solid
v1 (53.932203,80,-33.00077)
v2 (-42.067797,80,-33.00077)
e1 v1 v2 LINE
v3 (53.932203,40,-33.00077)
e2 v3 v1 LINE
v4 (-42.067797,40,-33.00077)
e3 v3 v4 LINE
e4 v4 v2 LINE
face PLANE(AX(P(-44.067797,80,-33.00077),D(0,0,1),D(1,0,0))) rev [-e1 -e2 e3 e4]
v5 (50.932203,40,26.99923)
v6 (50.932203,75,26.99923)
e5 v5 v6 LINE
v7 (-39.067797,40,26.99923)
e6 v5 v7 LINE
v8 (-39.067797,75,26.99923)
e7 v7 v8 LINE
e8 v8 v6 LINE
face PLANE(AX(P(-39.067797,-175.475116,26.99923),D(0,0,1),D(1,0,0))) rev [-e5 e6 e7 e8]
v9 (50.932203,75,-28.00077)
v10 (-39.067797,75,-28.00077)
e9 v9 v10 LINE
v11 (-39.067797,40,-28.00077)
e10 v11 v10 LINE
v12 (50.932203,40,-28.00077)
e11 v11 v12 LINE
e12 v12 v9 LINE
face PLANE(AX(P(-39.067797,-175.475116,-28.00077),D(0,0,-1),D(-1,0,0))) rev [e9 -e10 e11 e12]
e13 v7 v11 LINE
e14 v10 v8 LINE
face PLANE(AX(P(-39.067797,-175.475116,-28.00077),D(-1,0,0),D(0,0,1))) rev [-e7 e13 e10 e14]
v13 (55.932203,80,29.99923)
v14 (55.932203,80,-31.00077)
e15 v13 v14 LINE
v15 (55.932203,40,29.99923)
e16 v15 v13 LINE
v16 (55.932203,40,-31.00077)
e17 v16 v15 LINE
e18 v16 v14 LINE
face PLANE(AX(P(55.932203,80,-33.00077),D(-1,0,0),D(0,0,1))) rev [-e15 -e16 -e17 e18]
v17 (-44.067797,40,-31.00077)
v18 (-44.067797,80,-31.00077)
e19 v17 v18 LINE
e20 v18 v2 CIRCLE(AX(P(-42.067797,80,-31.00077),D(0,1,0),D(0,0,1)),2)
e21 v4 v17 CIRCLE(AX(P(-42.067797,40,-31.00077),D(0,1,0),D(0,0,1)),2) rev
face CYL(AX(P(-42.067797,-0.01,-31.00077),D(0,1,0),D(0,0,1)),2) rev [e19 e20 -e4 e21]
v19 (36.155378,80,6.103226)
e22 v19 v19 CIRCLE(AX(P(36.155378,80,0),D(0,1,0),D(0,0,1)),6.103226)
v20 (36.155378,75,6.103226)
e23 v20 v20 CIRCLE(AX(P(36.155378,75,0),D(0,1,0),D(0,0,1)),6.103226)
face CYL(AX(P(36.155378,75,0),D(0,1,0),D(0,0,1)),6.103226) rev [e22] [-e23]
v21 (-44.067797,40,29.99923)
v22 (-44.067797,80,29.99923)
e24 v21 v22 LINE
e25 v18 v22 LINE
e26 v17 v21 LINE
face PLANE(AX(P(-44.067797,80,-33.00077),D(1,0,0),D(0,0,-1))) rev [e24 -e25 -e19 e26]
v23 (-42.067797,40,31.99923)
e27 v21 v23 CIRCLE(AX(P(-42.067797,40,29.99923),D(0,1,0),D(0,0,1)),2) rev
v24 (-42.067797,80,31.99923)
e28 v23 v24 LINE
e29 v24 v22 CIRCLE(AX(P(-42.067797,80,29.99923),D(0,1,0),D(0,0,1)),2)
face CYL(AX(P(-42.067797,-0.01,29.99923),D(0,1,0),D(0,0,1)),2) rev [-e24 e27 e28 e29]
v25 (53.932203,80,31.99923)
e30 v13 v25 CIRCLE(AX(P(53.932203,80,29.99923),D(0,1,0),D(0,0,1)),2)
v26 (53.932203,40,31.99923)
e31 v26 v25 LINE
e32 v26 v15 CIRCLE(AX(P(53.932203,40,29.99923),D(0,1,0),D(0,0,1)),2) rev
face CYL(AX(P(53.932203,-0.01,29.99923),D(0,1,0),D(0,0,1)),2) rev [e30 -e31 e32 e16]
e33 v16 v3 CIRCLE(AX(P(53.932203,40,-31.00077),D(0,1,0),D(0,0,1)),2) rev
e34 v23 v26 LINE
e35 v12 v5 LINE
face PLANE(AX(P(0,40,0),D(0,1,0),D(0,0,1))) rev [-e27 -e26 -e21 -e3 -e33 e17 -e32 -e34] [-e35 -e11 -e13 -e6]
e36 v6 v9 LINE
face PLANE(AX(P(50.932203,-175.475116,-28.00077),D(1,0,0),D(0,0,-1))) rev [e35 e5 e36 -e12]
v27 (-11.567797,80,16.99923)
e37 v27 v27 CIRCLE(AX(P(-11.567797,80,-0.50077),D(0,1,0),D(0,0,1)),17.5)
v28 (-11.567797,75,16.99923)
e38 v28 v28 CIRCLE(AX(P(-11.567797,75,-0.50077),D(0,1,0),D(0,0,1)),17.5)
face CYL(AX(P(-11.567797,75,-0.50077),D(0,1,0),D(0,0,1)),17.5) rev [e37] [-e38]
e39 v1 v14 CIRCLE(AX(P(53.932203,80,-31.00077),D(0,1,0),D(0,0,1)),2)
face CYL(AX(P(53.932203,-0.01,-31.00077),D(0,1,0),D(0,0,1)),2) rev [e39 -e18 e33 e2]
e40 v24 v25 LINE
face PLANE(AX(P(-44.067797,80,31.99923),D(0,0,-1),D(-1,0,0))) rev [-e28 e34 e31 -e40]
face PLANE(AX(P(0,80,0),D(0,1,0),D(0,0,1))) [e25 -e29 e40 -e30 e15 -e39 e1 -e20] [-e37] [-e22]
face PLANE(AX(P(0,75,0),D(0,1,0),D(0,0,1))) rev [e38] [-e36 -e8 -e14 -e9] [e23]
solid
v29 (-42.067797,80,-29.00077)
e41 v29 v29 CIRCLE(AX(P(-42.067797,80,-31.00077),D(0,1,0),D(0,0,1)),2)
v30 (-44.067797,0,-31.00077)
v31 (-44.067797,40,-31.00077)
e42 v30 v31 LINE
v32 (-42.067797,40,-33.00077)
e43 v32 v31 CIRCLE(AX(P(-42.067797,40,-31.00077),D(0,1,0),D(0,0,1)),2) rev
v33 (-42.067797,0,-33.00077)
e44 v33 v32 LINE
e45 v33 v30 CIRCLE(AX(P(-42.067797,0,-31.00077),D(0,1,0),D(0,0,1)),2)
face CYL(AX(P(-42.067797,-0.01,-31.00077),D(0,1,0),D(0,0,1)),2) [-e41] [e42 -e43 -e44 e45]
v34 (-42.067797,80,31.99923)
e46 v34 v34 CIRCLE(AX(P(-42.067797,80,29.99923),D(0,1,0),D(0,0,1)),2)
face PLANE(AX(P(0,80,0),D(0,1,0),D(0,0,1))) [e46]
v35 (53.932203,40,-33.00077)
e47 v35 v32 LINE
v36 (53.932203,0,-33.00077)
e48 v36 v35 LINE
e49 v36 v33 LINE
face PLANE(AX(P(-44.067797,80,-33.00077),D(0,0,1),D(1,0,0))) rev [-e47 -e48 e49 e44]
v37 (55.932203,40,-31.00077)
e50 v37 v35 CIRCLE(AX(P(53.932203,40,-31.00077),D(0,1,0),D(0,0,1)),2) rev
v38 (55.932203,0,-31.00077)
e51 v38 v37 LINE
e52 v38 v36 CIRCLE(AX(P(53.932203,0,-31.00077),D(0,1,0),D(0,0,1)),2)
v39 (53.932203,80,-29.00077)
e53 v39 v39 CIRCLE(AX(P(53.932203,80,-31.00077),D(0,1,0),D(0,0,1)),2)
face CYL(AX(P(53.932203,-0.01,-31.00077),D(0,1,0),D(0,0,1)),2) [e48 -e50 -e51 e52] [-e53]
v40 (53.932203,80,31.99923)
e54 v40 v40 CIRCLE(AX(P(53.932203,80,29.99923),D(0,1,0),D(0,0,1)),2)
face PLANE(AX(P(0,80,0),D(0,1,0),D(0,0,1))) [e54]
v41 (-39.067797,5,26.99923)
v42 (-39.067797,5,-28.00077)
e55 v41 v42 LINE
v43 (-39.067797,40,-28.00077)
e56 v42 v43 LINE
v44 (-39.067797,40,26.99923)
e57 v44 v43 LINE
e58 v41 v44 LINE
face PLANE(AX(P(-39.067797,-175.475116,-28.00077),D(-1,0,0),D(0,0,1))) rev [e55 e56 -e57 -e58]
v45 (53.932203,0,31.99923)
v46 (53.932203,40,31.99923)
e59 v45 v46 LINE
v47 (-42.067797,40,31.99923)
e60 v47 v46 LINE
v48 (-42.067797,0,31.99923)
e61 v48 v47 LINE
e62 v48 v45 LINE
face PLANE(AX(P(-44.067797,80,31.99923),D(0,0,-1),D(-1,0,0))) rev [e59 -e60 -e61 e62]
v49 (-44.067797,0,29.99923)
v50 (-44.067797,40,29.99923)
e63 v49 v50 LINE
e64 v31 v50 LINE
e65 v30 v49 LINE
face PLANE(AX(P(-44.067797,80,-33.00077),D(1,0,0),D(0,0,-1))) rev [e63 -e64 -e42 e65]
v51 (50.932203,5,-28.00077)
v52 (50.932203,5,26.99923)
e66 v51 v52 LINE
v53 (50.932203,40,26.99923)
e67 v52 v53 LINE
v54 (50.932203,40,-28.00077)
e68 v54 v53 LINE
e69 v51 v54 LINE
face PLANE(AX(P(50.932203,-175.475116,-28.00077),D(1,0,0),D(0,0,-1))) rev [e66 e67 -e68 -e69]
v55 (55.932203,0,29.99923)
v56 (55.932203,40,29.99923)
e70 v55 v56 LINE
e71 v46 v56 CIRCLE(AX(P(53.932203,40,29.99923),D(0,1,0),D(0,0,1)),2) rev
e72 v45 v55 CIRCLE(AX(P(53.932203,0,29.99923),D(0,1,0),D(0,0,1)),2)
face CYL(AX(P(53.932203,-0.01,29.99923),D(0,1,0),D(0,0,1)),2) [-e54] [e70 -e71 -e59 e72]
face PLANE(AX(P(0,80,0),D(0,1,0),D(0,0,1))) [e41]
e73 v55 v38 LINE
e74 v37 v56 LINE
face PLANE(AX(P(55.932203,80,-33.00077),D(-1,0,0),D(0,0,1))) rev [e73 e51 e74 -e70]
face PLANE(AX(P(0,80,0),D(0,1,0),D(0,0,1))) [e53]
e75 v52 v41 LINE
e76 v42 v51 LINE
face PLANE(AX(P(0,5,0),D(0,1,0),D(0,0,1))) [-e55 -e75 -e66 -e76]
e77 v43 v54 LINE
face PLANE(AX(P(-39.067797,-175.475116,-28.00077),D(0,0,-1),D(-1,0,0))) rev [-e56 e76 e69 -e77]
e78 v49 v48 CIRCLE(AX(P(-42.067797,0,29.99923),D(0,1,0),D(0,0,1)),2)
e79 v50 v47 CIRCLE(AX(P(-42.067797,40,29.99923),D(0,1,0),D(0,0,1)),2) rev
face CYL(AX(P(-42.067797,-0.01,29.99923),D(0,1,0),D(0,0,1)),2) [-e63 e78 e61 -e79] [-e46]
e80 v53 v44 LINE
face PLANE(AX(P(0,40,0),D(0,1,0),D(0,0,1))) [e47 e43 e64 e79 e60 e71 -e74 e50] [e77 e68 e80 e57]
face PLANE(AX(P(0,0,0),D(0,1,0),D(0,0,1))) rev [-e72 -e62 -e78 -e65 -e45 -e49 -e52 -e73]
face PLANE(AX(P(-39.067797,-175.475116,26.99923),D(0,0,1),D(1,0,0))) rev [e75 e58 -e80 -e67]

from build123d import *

# Parameters (mm, degrees)
SKETCH1_W             = 100
SKETCH1_H             = 65
BOSS_EXTRUDE1_DEPTH   = 80
SKETCH2_W             = 90
SKETCH2_H             = 55
CUT_EXTRUDE2_DEPTH    = 75
SKETCH4_W             = 90
SKETCH4_H             = 55
BOSS_EXTRUDE2_DEPTH   = 5
SKETCH3_R             = 17.5
CUT_EXTRUDE3_DEPTH    = 5
SKETCH5_R             = 6.10322586
CUT_EXTRUDE4_DEPTH    = 5
SPLIT1_START          = -1
SPLIT1_DEPTH          = 82
SPLIT1_2_OUTLINE_R    = 2
SPLIT1_2_DEPTH        = 80
SPLIT1_3_OUTLINE_R    = 2
SPLIT1_3_DEPTH        = 80
SPLIT1_4_OUTLINE_R    = 2
SPLIT1_4_DEPTH        = 80
SPLIT1_5_OUTLINE_R    = 2
SPLIT1_5_DEPTH        = 80
SPLIT1_6_DEPTH        = 80
SPLIT1_7_DEPTH        = 80
SPLIT1_8_DEPTH        = 80
SPLIT1_9_DEPTH        = 80
SPLIT2_START          = 40
SPLIT2_OUTLINE_W      = 90
SPLIT2_OUTLINE_H      = 55
SPLIT2_DEPTH          = 40
SPLIT2_START_2        = 75
SPLIT2_2_OUTLINE_W    = 90
SPLIT2_2_OUTLINE_H    = 55
SPLIT2_2_OUTLINE_R    = 6.10322586
SPLIT2_2_OUTLINE_R_2  = 17.5
SPLIT2_2_DEPTH        = 5
SPLIT2_3_OUTLINE_R    = 2
SPLIT2_3_DEPTH        = 40
SPLIT2_4_OUTLINE_R    = 2
SPLIT2_4_DEPTH        = 40
SPLIT2_5_OUTLINE_R    = 2
SPLIT2_5_DEPTH        = 40
SPLIT2_6_OUTLINE_R    = 2
SPLIT2_6_DEPTH        = 40
SPLIT2_7_OUTLINE_R    = 2
SPLIT2_7_DEPTH        = 40
SPLIT2_8_OUTLINE_R    = 2
SPLIT2_8_DEPTH        = 40
SPLIT2_9_OUTLINE_R    = 2
SPLIT2_9_DEPTH        = 40
SPLIT2_10_OUTLINE_R   = 2
SPLIT2_10_DEPTH       = 40
SPLIT2_11_OUTLINE_R   = 6.10322586
SPLIT2_11_OUTLINE_R_2 = 17.5
SPLIT2_11_DEPTH       = 40


with BuildPart() as part:
    # Sketch1 → Boss-Extrude1 (new body)
    with BuildSketch(Plane(origin=(0, 0, 0), x_dir=(1, 0, 0), z_dir=(0, 1, 0))):
        with Locations((5.93220339, 0.500770416)):
            Rectangle(SKETCH1_W, SKETCH1_H)
    extrude(amount=BOSS_EXTRUDE1_DEPTH)

    # Sketch2 → Cut-Extrude2 (cut)
    with BuildSketch(Plane(origin=(0, 80, 0), x_dir=(1, 0, 0), z_dir=(0, 1, 0))):
        with Locations((5.93220339, 0.500770416)):
            Rectangle(SKETCH2_W, SKETCH2_H)
    extrude(amount=-CUT_EXTRUDE2_DEPTH, mode=Mode.SUBTRACT)

    # Sketch4 → Boss-Extrude2 (add)
    with BuildSketch(Plane(origin=(0, 80, 0), x_dir=(1, 0, 0), z_dir=(0, 1, 0))):
        with Locations((5.93220339, 0.500770416)):
            Rectangle(SKETCH4_W, SKETCH4_H)
    extrude(amount=-BOSS_EXTRUDE2_DEPTH)

    # Sketch3 → Cut-Extrude3 (cut)
    with BuildSketch(Plane(origin=(0, 80, 0), x_dir=(1, 0, 0), z_dir=(0, 1, 0))):
        with Locations(Location((-11.56779661, 0.500770416, 0), (0, 0, 270))):
            Circle(SKETCH3_R)
    extrude(amount=-CUT_EXTRUDE3_DEPTH, mode=Mode.SUBTRACT)

    # Sketch5 → Cut-Extrude4 (cut)
    with BuildSketch(Plane(origin=(0, 80, 0), x_dir=(1, 0, 0), z_dir=(0, 1, 0))):
        with Locations(Location((36.155377847, 0, 0), (0, 0, 270))):
            Circle(SKETCH5_R)
    extrude(amount=-CUT_EXTRUDE4_DEPTH, mode=Mode.SUBTRACT)

    # Split1: read off the stored shape, not the designer's step
    # Split1 outline → Split1 (cut)
    with BuildSketch(Plane(origin=(0, 0, 0), x_dir=(1, 0, 0), z_dir=(0, 1, 0)).offset(SPLIT1_START)):
        with BuildLine():
            Line((-44.06779661, 33.000770416), (-44.06779661, 31.000770416))
            ThreePointArc((-44.06779661, 31.000770416), (-40.653583048, 29.586556854), (-42.06779661, 33.000770416))
            Line((-42.06779661, 33.000770416), (-44.06779661, 33.000770416))
        make_face()
        with BuildLine():
            ThreePointArc((-42.06779661, -31.999229584), (-40.653583048, -28.585016022), (-44.06779661, -29.999229584))
            Line((-44.06779661, -29.999229584), (-44.06779661, -31.999229584))
            Line((-44.06779661, -31.999229584), (-42.06779661, -31.999229584))
        make_face()
        with BuildLine():
            Line((55.93220339, 33.000770416), (53.93220339, 33.000770416))
            ThreePointArc((53.93220339, 33.000770416), (52.517989827, 29.586556854), (55.93220339, 31.000770416))
            Line((55.93220339, 31.000770416), (55.93220339, 33.000770416))
        make_face()
        with BuildLine():
            ThreePointArc((55.93220339, -29.999229584), (52.517989827, -28.585016021), (53.93220339, -31.999229584))
            Line((53.93220339, -31.999229584), (55.93220339, -31.999229584))
            Line((55.93220339, -31.999229584), (55.93220339, -29.999229584))
        make_face()
    extrude(amount=SPLIT1_DEPTH, mode=Mode.SUBTRACT)

    # Split2 11 outline → Split2 11 (cut)
    with BuildSketch(Plane(origin=(0, 0, 0), x_dir=(1, 0, 0), z_dir=(0, 1, 0)).offset(SPLIT2_START)):
        with BuildLine():
            ThreePointArc((-42.06779661, 33.000770416), (-40.653583048, 29.586556854), (-44.06779661, 31.000770416))
            Line((-44.06779661, 31.000770416), (-44.06779661, -29.999229584))
            ThreePointArc((-44.06779661, -29.999229584), (-40.653583048, -28.585016022), (-42.06779661, -31.999229584))
            Line((-42.06779661, -31.999229584), (53.93220339, -31.999229584))
            ThreePointArc((53.93220339, -31.999229584), (52.517989827, -28.585016021), (55.93220339, -29.999229584))
            Line((55.93220339, -29.999229584), (55.93220339, 31.000770416))
            ThreePointArc((55.93220339, 31.000770416), (52.517989827, 29.586556854), (53.93220339, 33.000770416))
            Line((53.93220339, 33.000770416), (-42.06779661, 33.000770416))
        make_face()
        with Locations((36.155377847, 0)):
            Circle(SPLIT2_11_OUTLINE_R, mode=Mode.SUBTRACT)
        with Locations((-11.56779661, 0.500770416)):
            Circle(SPLIT2_11_OUTLINE_R_2, mode=Mode.SUBTRACT)
    extrude(amount=SPLIT2_11_DEPTH, mode=Mode.SUBTRACT)


with BuildPart() as body_2:
    # Split1 2 outline → Split1 2 (new body)
    with BuildSketch(Plane(origin=(0, 0, 0), x_dir=(1, 0, 0), z_dir=(0, 1, 0))):
        with Locations((53.93220339, 31.000770416)):
            Circle(SPLIT1_2_OUTLINE_R)
    extrude(amount=SPLIT1_2_DEPTH)

    # Split2 9 outline → Split2 9 (cut)
    with BuildSketch(Plane(origin=(0, 0, 0), x_dir=(1, 0, 0), z_dir=(0, 1, 0))):
        with Locations((53.93220339, 31.000770416)):
            Circle(SPLIT2_9_OUTLINE_R)
    extrude(amount=SPLIT2_9_DEPTH, mode=Mode.SUBTRACT)


with BuildPart() as body_3:
    # Split1 3 outline → Split1 3 (new body)
    with BuildSketch(Plane(origin=(0, 0, 0), x_dir=(1, 0, 0), z_dir=(0, 1, 0))):
        with Locations((-42.06779661, -29.999229584)):
            Circle(SPLIT1_3_OUTLINE_R)
    extrude(amount=SPLIT1_3_DEPTH)

    # Split2 3 outline → Split2 3 (cut)
    with BuildSketch(Plane(origin=(0, 0, 0), x_dir=(1, 0, 0), z_dir=(0, 1, 0)).offset(SPLIT2_START)):
        with Locations((-42.06779661, -29.999229584)):
            Circle(SPLIT2_3_OUTLINE_R)
    extrude(amount=SPLIT2_3_DEPTH, mode=Mode.SUBTRACT)


with BuildPart() as body_4:
    # Split1 4 outline → Split1 4 (new body)
    with BuildSketch(Plane(origin=(0, 0, 0), x_dir=(1, 0, 0), z_dir=(0, 1, 0))):
        with Locations((53.93220339, -29.999229584)):
            Circle(SPLIT1_4_OUTLINE_R)
    extrude(amount=SPLIT1_4_DEPTH)

    # Split2 6 outline → Split2 6 (cut)
    with BuildSketch(Plane(origin=(0, 0, 0), x_dir=(1, 0, 0), z_dir=(0, 1, 0))):
        with Locations((53.93220339, -29.999229584)):
            Circle(SPLIT2_6_OUTLINE_R)
    extrude(amount=SPLIT2_6_DEPTH, mode=Mode.SUBTRACT)


with BuildPart() as body_5:
    # Split1 5 outline → Split1 5 (new body)
    with BuildSketch(Plane(origin=(0, 0, 0), x_dir=(1, 0, 0), z_dir=(0, 1, 0))):
        with Locations((-42.06779661, 31.000770416)):
            Circle(SPLIT1_5_OUTLINE_R)
    extrude(amount=SPLIT1_5_DEPTH)

    # Split2 4 outline → Split2 4 (cut)
    with BuildSketch(Plane(origin=(0, 0, 0), x_dir=(1, 0, 0), z_dir=(0, 1, 0))):
        with Locations((-42.06779661, 31.000770416)):
            Circle(SPLIT2_4_OUTLINE_R)
    extrude(amount=SPLIT2_4_DEPTH, mode=Mode.SUBTRACT)


with BuildPart() as body_6:
    # Split1 6 outline → Split1 6 (new body)
    with BuildSketch(Plane(origin=(0, 0, 0), x_dir=(1, 0, 0), z_dir=(0, 1, 0))):
        with BuildLine():
            ThreePointArc((-42.06779661, -31.999229584), (-43.482010173, -31.413443146), (-44.06779661, -29.999229584))
            Line((-44.06779661, -29.999229584), (-44.06779661, -31.999229584))
            Line((-44.06779661, -31.999229584), (-42.06779661, -31.999229584))
        make_face()
    extrude(amount=SPLIT1_6_DEPTH)


with BuildPart() as body_7:
    # Split1 7 outline → Split1 7 (new body)
    with BuildSketch(Plane(origin=(0, 0, 0), x_dir=(1, 0, 0), z_dir=(0, 1, 0))):
        with BuildLine():
            ThreePointArc((-44.06779661, 31.000770416), (-43.482010173, 32.414983978), (-42.06779661, 33.000770416))
            Line((-42.06779661, 33.000770416), (-44.06779661, 33.000770416))
            Line((-44.06779661, 33.000770416), (-44.06779661, 31.000770416))
        make_face()
    extrude(amount=SPLIT1_7_DEPTH)


with BuildPart() as body_8:
    # Split1 8 outline → Split1 8 (new body)
    with BuildSketch(Plane(origin=(0, 0, 0), x_dir=(1, 0, 0), z_dir=(0, 1, 0))):
        with BuildLine():
            ThreePointArc((55.93220339, -29.999229584), (55.346416952, -31.413443146), (53.93220339, -31.999229584))
            Line((53.93220339, -31.999229584), (55.93220339, -31.999229584))
            Line((55.93220339, -31.999229584), (55.93220339, -29.999229584))
        make_face()
    extrude(amount=SPLIT1_8_DEPTH)


with BuildPart() as body_9:
    # Split1 9 outline → Split1 9 (new body)
    with BuildSketch(Plane(origin=(0, 0, 0), x_dir=(1, 0, 0), z_dir=(0, 1, 0))):
        with BuildLine():
            ThreePointArc((53.93220339, 33.000770416), (55.346416952, 32.414983978), (55.93220339, 31.000770416))
            Line((55.93220339, 31.000770416), (55.93220339, 33.000770416))
            Line((55.93220339, 33.000770416), (53.93220339, 33.000770416))
        make_face()
    extrude(amount=SPLIT1_9_DEPTH)


with BuildPart() as body_6_2:
    # Split2: read off the stored shape, not the designer's step
    # Split2 outline → Split2 (new body)
    with BuildSketch(Plane(origin=(0, 0, 0), x_dir=(1, 0, 0), z_dir=(0, 1, 0)).offset(SPLIT2_START)):
        with BuildLine():
            Line((55.93220339, -29.999229584), (55.93220339, 31.000770416))
            ThreePointArc((55.93220339, 31.000770416), (52.517989827, 29.586556854), (53.93220339, 33.000770416))
            Line((53.93220339, 33.000770416), (-42.06779661, 33.000770416))
            ThreePointArc((-42.06779661, 33.000770416), (-40.653583048, 29.586556854), (-44.06779661, 31.000770416))
            Line((-44.06779661, 31.000770416), (-44.06779661, -29.999229584))
            ThreePointArc((-44.06779661, -29.999229584), (-40.653583048, -28.585016022), (-42.06779661, -31.999229584))
            Line((-42.06779661, -31.999229584), (53.93220339, -31.999229584))
            ThreePointArc((53.93220339, -31.999229584), (52.517989827, -28.585016021), (55.93220339, -29.999229584))
        make_face()
        with Locations((5.93220339, 0.500770416)):
            Rectangle(SPLIT2_OUTLINE_W, SPLIT2_OUTLINE_H, mode=Mode.SUBTRACT)
    extrude(amount=SPLIT2_DEPTH)

    # Split2 2 outline → Split2 2 (add)
    with BuildSketch(Plane(origin=(0, 0, 0), x_dir=(1, 0, 0), z_dir=(0, 1, 0)).offset(SPLIT2_START_2)):
        with Locations((5.93220339, 0.500770416)):
            Rectangle(SPLIT2_2_OUTLINE_W, SPLIT2_2_OUTLINE_H)
        with Locations((36.155377847, 0)):
            Circle(SPLIT2_2_OUTLINE_R, mode=Mode.SUBTRACT)
        with Locations((-11.56779661, 0.500770416)):
            Circle(SPLIT2_2_OUTLINE_R_2, mode=Mode.SUBTRACT)
    extrude(amount=SPLIT2_2_DEPTH)


with BuildPart() as body_7_2:
    # Split2 5 outline → Split2 5 (new body)
    with BuildSketch(Plane(origin=(0, 0, 0), x_dir=(1, 0, 0), z_dir=(0, 1, 0))):
        with Locations((-42.06779661, 31.000770416)):
            Circle(SPLIT2_5_OUTLINE_R)
    extrude(amount=SPLIT2_5_DEPTH)


with BuildPart() as body_8_2:
    # Split2 7 outline → Split2 7 (new body)
    with BuildSketch(Plane(origin=(0, 0, 0), x_dir=(1, 0, 0), z_dir=(0, 1, 0)).offset(SPLIT2_START)):
        with Locations((-42.06779661, -29.999229584)):
            Circle(SPLIT2_7_OUTLINE_R)
    extrude(amount=SPLIT2_7_DEPTH)


with BuildPart() as body_9_2:
    # Split2 8 outline → Split2 8 (new body)
    with BuildSketch(Plane(origin=(0, 0, 0), x_dir=(1, 0, 0), z_dir=(0, 1, 0))):
        with Locations((53.93220339, -29.999229584)):
            Circle(SPLIT2_8_OUTLINE_R)
    extrude(amount=SPLIT2_8_DEPTH)


with BuildPart() as body_10:
    # Split2 10 outline → Split2 10 (new body)
    with BuildSketch(Plane(origin=(0, 0, 0), x_dir=(1, 0, 0), z_dir=(0, 1, 0))):
        with Locations((53.93220339, 31.000770416)):
            Circle(SPLIT2_10_OUTLINE_R)
    extrude(amount=SPLIT2_10_DEPTH)


with BuildPart() as part_1:
    add(part.part)

    # Combine1: read off the stored shape, not the designer's step
    # Combine1: union body 3, body 5, body 7 2, body 4, body 8 2, body 9 2, body 2, body 10
    add(body_3.part)
    add(body_5.part)
    add(body_7_2.part)
    add(body_4.part)
    add(body_8_2.part)
    add(body_9_2.part)
    add(body_2.part)
    add(body_10.part)


solid = Compound([body_6_2.part, part_1.part])
